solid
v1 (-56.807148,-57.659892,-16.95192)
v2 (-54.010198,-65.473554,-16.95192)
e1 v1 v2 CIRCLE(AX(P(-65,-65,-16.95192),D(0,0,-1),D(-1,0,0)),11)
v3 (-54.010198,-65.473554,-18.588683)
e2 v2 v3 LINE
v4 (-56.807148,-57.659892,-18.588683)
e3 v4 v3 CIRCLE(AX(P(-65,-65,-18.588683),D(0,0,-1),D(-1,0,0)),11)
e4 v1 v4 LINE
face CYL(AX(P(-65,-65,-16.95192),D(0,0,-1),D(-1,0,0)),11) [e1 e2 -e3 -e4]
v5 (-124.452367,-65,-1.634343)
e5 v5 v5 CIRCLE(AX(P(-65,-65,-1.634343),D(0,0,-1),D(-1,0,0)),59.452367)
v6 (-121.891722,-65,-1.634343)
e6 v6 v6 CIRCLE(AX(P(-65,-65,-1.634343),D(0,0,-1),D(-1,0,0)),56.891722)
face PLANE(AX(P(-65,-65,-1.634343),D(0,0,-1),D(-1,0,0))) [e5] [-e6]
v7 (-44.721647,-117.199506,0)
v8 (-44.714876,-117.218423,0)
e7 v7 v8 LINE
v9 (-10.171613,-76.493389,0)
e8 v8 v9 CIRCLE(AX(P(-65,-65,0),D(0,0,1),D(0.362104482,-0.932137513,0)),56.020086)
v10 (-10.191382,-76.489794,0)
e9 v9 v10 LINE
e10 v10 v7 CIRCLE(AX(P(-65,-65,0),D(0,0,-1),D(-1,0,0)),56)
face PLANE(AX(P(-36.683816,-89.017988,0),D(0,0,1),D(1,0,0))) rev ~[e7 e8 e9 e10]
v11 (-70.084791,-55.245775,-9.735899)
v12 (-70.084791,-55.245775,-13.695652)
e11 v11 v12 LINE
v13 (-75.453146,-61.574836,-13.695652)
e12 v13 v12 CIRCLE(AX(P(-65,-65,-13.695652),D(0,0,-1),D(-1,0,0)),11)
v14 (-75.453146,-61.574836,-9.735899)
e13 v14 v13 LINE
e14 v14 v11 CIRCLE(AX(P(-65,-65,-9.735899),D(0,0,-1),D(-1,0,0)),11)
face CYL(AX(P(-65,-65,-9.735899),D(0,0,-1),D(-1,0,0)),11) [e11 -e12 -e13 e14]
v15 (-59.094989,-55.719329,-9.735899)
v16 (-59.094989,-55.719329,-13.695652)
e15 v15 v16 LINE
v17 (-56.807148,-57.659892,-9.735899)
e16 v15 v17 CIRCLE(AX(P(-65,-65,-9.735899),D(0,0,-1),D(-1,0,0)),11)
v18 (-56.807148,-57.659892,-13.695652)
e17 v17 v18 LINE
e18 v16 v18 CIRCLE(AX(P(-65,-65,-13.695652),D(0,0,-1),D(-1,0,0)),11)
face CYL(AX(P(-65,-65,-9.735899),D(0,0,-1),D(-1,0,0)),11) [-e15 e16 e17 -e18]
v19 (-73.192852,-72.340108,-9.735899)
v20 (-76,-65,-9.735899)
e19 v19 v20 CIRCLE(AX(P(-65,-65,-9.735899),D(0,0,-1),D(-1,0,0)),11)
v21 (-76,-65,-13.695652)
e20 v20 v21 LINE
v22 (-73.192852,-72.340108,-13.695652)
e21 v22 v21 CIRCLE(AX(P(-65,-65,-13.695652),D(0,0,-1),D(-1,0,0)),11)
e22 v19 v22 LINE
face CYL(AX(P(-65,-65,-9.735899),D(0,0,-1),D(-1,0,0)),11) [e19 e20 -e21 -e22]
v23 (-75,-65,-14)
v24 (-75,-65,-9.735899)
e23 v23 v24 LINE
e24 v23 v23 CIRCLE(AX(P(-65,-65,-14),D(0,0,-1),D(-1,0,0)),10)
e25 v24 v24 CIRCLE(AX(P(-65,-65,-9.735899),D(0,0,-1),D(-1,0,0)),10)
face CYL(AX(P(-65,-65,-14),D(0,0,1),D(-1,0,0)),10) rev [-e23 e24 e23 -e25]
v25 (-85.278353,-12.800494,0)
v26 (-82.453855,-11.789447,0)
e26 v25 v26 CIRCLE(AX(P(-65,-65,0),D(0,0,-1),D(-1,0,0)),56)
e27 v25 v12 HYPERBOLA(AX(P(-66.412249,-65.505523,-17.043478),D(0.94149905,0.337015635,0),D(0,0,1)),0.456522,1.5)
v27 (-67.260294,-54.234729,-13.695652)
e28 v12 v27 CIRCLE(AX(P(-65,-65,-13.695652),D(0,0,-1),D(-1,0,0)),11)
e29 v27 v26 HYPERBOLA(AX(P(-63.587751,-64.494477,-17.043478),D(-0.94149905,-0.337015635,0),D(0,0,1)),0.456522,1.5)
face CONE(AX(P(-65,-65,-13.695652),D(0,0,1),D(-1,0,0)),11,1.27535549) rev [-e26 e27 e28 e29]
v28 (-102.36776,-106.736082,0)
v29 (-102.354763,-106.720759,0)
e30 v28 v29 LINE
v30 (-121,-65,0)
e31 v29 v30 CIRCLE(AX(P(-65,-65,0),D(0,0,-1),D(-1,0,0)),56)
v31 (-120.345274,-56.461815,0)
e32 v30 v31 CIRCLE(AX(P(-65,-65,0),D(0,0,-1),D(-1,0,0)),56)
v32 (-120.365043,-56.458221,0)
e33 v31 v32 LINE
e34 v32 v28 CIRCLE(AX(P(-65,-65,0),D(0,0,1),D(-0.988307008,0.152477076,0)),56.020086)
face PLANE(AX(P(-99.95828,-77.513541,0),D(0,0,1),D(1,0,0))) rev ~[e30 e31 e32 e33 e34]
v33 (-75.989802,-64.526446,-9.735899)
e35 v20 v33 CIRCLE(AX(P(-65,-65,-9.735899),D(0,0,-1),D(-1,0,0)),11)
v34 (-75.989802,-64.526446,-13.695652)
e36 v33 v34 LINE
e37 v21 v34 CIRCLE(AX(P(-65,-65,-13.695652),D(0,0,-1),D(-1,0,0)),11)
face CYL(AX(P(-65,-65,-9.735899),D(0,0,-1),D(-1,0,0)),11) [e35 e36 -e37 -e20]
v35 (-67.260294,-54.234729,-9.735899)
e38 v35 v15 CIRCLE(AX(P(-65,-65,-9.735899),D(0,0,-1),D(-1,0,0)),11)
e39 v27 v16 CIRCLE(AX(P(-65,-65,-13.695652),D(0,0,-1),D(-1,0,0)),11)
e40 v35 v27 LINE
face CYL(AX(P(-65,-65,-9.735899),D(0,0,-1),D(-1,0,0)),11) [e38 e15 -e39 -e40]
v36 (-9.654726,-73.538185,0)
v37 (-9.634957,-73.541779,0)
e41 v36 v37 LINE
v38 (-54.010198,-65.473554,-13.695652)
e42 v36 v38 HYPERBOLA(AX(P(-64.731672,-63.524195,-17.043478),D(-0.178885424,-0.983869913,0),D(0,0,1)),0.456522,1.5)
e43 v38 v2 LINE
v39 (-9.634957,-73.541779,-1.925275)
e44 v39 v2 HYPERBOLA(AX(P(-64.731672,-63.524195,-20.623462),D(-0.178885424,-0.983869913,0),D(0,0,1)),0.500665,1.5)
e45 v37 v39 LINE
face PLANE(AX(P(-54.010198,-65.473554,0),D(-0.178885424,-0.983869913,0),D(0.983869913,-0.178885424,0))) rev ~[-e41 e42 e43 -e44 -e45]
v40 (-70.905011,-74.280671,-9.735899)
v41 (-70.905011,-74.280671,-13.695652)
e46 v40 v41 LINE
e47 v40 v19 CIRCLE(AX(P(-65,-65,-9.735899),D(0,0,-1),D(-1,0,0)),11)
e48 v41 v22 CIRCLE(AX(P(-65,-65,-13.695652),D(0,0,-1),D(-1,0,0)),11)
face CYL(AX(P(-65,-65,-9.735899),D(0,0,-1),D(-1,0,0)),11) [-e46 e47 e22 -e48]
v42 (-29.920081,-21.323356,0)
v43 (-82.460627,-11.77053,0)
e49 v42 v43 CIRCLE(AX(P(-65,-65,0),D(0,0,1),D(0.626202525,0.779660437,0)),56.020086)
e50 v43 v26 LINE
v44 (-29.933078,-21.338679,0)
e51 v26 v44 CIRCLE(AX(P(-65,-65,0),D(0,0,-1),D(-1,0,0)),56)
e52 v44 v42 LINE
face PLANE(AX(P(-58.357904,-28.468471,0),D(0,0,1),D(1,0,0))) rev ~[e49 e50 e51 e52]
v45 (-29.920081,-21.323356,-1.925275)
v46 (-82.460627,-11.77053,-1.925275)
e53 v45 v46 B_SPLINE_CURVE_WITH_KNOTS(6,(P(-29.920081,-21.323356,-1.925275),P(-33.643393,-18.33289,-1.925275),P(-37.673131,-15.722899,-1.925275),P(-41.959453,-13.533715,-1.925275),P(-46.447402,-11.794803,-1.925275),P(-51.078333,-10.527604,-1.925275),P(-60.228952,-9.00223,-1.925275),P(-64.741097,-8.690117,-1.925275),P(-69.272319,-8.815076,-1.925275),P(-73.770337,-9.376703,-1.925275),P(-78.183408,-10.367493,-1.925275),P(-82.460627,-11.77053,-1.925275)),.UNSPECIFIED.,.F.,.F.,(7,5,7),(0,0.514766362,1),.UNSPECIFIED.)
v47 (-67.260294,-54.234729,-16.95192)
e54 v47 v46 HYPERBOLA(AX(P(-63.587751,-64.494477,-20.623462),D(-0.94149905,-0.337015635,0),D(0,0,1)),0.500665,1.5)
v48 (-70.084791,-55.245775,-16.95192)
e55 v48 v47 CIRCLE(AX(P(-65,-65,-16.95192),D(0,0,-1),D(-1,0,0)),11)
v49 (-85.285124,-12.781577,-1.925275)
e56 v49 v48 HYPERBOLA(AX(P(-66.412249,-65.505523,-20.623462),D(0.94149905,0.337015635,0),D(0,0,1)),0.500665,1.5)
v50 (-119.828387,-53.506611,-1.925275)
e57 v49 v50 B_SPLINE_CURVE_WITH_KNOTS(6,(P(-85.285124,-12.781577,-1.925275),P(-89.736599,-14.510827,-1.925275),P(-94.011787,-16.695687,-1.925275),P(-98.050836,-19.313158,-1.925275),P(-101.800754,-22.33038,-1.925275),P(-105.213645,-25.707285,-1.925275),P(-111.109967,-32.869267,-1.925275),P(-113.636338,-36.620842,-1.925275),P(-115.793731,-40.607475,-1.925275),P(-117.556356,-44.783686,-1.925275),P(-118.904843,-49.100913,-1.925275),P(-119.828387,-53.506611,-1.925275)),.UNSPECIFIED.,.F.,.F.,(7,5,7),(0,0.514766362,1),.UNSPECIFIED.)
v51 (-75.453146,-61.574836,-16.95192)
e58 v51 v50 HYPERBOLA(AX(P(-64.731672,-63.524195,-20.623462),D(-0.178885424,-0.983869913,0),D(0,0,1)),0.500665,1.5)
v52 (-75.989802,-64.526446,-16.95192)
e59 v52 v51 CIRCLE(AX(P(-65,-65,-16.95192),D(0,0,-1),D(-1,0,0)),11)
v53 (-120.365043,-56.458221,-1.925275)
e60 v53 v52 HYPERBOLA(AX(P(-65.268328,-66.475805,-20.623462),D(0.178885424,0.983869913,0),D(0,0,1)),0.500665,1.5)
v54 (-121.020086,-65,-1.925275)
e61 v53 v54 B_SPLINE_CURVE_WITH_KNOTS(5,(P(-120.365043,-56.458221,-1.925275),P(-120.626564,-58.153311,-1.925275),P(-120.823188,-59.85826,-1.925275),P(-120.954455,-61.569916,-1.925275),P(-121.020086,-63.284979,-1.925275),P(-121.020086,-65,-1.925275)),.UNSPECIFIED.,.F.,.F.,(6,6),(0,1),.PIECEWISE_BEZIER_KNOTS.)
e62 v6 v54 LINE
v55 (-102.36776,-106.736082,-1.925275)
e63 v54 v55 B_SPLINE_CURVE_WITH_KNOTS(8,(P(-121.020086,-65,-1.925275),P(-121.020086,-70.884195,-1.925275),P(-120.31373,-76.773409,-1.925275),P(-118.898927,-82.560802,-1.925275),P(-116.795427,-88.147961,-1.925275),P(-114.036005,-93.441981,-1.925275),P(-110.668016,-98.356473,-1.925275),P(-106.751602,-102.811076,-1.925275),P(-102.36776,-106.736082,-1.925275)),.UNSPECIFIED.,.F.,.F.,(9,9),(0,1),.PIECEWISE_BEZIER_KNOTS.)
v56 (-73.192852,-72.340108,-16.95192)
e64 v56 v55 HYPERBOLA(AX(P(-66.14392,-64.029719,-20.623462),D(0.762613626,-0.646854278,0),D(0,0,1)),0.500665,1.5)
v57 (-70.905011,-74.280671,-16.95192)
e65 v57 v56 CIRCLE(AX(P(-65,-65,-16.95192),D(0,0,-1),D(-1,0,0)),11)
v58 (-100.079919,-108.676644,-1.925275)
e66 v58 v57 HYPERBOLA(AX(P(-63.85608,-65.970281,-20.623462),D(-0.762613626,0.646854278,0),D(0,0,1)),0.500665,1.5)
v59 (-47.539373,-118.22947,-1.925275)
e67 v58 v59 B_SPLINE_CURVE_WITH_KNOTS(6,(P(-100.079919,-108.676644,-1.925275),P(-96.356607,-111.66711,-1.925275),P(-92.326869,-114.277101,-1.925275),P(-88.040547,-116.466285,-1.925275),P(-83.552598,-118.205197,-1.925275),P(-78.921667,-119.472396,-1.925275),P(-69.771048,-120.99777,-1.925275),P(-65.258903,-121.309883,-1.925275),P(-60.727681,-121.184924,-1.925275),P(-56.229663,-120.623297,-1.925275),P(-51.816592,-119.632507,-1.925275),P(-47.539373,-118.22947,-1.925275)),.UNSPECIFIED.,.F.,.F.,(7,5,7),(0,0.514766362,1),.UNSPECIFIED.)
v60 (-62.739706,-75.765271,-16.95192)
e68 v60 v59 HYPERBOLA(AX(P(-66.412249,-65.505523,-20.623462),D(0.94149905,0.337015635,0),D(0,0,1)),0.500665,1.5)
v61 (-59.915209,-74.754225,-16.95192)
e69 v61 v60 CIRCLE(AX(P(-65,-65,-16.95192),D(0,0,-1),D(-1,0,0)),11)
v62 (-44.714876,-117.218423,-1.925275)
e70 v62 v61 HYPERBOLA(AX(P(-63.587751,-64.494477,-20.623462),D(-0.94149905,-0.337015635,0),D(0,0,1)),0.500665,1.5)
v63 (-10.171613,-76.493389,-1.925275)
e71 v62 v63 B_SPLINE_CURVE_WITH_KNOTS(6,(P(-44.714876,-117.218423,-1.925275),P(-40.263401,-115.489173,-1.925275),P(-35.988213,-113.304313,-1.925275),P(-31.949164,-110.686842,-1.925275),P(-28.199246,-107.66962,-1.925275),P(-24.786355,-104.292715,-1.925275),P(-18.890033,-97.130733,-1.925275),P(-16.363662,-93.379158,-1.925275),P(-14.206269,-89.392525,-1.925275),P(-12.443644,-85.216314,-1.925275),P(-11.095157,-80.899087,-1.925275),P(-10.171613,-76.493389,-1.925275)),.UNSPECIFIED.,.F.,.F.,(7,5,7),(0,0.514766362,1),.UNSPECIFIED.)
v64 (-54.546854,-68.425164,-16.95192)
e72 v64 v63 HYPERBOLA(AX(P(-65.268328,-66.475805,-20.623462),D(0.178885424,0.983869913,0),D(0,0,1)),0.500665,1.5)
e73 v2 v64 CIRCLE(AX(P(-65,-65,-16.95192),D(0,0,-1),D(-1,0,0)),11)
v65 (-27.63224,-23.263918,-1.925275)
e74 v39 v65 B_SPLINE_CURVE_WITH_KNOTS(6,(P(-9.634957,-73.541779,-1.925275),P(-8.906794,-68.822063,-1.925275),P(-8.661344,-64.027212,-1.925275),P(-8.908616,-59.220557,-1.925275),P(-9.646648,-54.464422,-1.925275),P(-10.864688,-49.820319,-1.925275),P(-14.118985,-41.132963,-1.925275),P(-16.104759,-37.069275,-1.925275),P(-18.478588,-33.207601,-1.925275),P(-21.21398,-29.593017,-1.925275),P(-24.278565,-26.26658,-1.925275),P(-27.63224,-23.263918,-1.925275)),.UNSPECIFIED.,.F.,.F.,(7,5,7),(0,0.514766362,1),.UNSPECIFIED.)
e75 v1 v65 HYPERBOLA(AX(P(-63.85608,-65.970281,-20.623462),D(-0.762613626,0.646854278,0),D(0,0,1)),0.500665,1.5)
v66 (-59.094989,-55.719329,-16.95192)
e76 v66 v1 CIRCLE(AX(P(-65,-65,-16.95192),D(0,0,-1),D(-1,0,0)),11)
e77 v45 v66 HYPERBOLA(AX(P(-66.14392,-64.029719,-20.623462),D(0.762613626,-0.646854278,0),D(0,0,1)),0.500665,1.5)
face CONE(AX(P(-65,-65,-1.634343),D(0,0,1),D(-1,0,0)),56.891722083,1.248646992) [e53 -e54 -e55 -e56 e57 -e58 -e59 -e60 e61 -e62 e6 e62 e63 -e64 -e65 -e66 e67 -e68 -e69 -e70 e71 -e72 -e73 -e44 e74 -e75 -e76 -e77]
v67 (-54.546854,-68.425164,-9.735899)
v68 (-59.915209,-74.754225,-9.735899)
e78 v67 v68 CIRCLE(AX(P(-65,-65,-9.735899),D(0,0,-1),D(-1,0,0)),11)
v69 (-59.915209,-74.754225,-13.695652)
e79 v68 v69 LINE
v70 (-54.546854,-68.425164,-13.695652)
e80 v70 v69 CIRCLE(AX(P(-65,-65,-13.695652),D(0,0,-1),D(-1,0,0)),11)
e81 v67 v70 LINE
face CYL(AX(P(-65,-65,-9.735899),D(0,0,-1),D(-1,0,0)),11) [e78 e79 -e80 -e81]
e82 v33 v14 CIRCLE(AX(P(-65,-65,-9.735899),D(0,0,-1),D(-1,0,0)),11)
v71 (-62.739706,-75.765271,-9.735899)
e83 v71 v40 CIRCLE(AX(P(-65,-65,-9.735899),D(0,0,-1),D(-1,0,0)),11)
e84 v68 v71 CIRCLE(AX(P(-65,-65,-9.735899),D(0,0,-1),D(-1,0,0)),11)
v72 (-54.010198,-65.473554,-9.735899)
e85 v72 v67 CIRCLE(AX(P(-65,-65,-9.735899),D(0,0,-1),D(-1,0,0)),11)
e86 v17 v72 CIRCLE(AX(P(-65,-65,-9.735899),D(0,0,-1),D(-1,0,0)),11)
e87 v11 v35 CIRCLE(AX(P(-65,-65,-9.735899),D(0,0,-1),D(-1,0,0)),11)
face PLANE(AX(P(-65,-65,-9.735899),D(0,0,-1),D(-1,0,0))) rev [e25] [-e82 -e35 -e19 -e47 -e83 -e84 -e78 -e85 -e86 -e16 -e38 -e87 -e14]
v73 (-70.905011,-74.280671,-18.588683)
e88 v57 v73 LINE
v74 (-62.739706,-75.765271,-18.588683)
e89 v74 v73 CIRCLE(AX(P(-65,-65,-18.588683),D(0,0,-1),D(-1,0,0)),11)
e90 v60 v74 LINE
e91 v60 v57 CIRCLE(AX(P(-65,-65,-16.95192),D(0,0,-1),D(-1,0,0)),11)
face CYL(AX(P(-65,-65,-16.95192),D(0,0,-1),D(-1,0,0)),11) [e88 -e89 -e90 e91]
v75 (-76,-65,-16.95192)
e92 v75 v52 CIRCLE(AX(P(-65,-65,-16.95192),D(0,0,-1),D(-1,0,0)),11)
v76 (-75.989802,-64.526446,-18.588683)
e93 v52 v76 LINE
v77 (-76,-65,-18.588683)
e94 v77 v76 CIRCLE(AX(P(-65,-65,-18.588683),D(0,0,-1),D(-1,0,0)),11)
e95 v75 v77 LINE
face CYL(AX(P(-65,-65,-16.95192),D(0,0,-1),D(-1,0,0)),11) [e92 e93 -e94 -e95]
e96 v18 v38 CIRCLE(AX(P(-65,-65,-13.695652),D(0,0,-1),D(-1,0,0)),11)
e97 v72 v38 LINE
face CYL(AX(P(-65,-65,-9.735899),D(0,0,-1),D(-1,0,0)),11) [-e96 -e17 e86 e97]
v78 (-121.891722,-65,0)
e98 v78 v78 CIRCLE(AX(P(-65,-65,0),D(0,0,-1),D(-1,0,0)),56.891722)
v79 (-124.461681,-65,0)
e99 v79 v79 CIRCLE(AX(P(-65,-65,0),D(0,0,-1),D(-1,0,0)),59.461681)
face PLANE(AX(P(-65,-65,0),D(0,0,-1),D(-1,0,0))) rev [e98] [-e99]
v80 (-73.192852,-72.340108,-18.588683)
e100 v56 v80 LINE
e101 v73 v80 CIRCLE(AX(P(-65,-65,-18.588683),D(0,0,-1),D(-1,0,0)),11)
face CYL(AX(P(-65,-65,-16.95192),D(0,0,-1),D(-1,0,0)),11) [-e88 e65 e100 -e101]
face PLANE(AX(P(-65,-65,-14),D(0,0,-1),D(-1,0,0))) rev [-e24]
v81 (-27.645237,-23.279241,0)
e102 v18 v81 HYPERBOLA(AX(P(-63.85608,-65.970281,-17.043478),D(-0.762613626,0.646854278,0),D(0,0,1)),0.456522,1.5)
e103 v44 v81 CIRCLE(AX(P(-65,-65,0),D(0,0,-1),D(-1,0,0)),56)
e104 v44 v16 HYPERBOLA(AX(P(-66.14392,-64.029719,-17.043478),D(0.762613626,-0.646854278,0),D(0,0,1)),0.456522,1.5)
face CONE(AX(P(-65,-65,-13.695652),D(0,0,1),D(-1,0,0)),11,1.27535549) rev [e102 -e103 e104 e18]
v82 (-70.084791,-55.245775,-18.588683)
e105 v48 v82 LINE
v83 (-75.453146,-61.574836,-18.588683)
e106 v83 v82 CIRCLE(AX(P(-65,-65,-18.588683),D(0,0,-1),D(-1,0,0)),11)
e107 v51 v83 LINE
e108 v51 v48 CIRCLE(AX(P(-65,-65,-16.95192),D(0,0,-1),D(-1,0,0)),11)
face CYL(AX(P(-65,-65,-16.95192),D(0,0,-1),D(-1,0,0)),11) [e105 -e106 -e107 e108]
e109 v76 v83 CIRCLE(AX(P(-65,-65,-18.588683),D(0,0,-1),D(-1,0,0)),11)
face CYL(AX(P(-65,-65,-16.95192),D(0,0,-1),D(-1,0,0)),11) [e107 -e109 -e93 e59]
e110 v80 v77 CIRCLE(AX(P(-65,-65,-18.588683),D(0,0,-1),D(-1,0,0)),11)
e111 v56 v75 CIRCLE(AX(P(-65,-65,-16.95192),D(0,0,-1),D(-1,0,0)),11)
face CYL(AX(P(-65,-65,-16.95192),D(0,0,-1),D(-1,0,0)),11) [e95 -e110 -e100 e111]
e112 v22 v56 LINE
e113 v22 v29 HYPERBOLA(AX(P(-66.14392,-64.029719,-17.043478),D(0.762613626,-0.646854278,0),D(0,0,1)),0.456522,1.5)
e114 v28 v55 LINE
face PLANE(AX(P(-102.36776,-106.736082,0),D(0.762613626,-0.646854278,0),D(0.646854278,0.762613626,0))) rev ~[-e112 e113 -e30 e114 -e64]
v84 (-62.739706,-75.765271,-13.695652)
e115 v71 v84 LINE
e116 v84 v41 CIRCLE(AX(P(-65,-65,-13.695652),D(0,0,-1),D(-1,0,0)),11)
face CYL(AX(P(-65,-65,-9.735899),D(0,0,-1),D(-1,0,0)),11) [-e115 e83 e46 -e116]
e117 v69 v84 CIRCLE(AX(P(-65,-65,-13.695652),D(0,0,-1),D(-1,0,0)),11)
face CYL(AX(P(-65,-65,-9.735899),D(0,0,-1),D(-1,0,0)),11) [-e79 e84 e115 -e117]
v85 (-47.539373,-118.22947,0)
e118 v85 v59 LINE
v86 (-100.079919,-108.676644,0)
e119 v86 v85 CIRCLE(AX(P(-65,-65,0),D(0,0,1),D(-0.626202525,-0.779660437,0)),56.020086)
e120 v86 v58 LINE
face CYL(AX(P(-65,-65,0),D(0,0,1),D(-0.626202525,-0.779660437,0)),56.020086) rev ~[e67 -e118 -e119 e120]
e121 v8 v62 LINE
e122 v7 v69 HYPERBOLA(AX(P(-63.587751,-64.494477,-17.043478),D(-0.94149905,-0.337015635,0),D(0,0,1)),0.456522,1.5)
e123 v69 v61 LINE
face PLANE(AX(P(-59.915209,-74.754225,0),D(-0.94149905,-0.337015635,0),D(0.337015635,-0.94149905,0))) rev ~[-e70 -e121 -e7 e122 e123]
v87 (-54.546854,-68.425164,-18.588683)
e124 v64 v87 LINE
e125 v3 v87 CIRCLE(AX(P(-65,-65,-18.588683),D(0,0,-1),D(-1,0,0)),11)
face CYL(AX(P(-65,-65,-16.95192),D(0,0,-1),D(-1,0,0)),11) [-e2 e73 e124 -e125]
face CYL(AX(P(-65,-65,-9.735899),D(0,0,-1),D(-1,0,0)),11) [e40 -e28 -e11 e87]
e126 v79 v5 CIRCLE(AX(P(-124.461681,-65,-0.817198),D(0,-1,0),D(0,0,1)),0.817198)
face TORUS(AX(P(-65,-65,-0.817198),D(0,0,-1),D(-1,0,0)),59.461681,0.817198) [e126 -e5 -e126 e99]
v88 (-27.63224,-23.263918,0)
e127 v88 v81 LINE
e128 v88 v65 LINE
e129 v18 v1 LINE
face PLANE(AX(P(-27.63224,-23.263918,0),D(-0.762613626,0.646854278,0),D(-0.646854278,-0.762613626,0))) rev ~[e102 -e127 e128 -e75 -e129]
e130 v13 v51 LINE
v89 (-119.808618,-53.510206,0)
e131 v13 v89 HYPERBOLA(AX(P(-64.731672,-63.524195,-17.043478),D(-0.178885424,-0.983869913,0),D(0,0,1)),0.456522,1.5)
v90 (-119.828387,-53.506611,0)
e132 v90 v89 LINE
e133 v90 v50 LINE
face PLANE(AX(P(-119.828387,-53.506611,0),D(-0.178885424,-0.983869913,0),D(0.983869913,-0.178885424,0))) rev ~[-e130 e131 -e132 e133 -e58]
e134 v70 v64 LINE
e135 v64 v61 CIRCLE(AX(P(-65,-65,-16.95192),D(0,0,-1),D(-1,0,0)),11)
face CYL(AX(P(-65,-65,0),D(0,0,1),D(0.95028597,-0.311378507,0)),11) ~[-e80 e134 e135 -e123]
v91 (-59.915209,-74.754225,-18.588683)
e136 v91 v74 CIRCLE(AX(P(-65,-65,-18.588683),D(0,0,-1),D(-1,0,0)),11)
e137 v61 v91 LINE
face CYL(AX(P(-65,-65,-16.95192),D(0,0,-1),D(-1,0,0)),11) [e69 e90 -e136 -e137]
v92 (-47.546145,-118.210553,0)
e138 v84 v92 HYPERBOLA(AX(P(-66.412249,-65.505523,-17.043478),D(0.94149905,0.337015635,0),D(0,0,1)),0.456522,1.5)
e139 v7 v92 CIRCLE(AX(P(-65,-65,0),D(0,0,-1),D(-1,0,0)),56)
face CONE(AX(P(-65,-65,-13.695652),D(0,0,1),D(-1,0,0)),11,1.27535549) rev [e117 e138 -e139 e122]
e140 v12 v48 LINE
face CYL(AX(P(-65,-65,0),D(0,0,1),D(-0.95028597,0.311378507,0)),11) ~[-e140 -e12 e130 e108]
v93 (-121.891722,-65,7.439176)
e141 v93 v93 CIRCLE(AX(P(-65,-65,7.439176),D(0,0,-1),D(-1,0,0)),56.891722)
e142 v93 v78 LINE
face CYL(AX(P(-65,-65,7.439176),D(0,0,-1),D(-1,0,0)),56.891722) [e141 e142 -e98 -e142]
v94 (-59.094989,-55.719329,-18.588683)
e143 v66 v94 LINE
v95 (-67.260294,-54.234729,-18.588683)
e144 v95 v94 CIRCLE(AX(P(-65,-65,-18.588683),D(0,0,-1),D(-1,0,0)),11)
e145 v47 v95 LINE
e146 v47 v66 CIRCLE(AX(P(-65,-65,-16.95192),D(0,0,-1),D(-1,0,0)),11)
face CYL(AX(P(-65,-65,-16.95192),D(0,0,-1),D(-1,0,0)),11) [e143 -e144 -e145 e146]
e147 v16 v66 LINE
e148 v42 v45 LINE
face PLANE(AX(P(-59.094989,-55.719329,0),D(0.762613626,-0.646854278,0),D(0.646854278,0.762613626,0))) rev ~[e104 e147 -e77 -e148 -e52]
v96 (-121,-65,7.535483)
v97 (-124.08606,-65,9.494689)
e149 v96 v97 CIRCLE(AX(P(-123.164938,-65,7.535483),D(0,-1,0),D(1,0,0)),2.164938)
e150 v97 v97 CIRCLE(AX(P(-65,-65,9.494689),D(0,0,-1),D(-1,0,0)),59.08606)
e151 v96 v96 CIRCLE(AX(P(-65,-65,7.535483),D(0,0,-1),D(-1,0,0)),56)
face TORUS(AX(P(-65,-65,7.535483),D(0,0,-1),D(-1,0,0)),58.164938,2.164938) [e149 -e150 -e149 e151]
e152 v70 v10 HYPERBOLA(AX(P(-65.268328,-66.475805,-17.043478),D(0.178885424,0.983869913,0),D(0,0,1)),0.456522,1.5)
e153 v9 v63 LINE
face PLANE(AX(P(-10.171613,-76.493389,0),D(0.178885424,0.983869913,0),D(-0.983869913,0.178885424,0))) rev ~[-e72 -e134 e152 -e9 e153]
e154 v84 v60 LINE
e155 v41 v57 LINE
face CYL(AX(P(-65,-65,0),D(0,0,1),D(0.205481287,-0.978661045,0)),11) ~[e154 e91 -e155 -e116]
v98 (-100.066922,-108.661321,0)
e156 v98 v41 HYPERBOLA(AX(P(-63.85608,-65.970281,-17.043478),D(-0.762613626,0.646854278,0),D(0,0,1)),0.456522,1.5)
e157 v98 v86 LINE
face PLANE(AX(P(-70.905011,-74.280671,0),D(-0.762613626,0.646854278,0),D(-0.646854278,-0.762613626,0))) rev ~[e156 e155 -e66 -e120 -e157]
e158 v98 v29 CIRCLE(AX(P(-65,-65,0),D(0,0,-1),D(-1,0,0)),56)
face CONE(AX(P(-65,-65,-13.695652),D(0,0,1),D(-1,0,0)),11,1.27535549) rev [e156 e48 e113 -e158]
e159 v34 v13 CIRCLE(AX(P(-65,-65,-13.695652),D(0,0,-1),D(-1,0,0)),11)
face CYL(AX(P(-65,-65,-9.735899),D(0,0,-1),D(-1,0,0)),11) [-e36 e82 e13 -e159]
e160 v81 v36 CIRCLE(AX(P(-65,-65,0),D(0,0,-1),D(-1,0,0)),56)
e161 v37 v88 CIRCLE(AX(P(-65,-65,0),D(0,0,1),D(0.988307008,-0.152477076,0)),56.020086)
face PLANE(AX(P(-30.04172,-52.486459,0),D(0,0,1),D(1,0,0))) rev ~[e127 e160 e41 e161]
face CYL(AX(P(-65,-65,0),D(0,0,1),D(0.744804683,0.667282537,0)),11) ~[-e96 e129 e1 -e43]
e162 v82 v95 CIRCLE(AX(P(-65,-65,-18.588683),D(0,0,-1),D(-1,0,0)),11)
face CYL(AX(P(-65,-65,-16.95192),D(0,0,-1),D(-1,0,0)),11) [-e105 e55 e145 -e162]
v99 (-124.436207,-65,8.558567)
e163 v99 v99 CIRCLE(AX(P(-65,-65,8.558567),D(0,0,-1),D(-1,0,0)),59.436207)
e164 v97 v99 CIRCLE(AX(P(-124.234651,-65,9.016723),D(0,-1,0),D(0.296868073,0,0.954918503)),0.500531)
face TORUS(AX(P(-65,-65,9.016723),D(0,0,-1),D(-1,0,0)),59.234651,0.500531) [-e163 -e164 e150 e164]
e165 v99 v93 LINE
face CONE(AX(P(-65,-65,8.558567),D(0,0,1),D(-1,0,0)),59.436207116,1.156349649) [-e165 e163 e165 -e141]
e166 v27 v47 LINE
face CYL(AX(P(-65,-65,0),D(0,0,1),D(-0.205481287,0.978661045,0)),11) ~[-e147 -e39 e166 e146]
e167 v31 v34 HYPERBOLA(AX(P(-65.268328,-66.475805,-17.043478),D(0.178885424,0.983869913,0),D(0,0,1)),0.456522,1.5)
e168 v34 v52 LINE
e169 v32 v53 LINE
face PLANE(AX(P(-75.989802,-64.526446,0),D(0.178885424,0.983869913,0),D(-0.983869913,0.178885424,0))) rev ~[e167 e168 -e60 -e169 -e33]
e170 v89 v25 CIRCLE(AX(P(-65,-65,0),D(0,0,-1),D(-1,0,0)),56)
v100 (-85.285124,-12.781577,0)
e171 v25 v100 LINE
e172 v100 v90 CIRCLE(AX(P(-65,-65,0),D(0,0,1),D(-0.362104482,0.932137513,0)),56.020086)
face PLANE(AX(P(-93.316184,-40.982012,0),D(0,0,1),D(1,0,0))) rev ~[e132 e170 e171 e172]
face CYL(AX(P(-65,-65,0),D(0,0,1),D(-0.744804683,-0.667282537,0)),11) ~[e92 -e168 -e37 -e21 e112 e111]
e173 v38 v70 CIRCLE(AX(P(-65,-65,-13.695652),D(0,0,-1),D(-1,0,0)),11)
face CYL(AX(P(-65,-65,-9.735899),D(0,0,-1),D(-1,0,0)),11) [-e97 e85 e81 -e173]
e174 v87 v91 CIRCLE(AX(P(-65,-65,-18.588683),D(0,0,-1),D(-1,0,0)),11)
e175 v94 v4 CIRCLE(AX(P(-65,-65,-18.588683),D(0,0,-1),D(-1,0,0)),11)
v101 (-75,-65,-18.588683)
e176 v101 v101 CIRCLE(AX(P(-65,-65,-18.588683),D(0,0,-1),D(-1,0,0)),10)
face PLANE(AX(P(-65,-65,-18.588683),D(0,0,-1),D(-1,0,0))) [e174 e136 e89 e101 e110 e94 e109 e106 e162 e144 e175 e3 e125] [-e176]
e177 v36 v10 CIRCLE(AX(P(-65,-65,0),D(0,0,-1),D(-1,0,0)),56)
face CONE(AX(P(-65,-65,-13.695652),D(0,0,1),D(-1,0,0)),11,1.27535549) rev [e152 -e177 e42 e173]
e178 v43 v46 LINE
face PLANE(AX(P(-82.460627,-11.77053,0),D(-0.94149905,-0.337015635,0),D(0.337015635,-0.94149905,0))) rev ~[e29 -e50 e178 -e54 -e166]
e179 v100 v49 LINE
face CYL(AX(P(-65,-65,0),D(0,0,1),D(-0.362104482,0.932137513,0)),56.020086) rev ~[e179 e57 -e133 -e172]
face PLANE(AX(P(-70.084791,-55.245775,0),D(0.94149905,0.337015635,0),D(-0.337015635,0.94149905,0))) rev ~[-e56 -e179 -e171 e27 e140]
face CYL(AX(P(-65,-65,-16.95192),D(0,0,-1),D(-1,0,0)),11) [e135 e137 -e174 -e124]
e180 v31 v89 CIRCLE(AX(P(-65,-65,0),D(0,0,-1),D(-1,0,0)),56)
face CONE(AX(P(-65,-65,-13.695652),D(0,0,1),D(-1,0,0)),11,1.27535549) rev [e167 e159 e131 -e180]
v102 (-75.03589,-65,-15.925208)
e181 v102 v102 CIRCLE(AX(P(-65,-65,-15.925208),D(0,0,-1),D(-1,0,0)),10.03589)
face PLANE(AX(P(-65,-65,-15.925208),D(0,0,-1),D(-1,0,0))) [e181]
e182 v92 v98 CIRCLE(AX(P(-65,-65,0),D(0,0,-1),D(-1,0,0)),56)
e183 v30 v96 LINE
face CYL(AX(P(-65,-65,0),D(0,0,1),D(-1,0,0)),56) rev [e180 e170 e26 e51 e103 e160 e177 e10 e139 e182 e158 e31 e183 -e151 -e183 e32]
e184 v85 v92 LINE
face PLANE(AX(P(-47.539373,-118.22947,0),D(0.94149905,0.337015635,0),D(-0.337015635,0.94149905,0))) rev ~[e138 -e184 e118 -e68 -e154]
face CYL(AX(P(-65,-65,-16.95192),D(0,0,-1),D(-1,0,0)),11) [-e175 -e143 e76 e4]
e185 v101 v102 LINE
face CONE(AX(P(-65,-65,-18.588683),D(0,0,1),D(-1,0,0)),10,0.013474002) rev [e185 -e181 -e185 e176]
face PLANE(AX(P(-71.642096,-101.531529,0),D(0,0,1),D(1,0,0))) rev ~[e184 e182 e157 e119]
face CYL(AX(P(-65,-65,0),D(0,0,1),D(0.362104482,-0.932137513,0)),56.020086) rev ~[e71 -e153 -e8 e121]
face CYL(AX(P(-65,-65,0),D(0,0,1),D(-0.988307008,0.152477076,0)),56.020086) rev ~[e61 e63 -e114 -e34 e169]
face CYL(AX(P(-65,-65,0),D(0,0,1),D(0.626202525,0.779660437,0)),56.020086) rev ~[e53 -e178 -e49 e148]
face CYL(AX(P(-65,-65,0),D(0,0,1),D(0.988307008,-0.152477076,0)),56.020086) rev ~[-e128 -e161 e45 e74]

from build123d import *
from build123d import SkipClean  # not in build123d's __all__

# Parameters (mm, degrees)
F5_DEPTH = 25


with BuildPart() as f3:
    # F2 (on offset) → F3 (revolve)
    with BuildSketch(Plane.XZ.offset(65)):
        with BuildLine():
            Line((-65, -15.9252075107), (-65, -14))
            Line((-65, -14), (-75, -14))
            Line((-75, -14), (-75, -9.7358990461))
            Line((-75, -9.7358990461), (-76, -9.7358990461))
            Line((-76, -9.7358990461), (-76, -13.6956521739))
            Line((-76, -13.6956521739), (-121, 0))
            Line((-121, 0), (-121, 7.5354827568))
            ThreePointArc((-121, 7.5354827568), (-122.0045964257, 9.3632036252), (-124.0860596299, 9.4946892932))
            ThreePointArc((-124.0860596299, 9.4946892932), (-124.7034612564, 9.1920763963), (-124.4362071157, 8.558566682))
            Line((-124.4362071157, 8.558566682), (-121.8917220831, 7.4391760863))
            Line((-121.8917220831, 7.4391760863), (-121.8917220831, 0))
            Line((-121.8917220831, 0), (-124.4616806507, 0))
            ThreePointArc((-124.4616806507, 0), (-125.2788653783, -0.8218546839), (-124.452367425, -1.6343429199))
            Line((-124.452367425, -1.6343429199), (-121.8917220831, -1.6343429199))
            Line((-121.8917220831, -1.6343429199), (-76, -16.9519204646))
            Line((-76, -16.9519204646), (-76, -18.5886826366))
            Line((-76, -18.5886826366), (-75, -18.5886826366))
            Line((-75, -18.5886826366), (-75.03588984, -15.9252075107))
            Line((-75.03588984, -15.9252075107), (-65, -15.9252075107))
        make_face()
    revolve(axis=Axis((-65, -65, -7), (0, 0, -1)))

    # F4 (on Top) → F5 (cut)
    with BuildSketch(Plane.XY):
        with BuildLine():
            ThreePointArc((-56.80714849, -57.6598920897), (-54.643510446, -61.2928280161), (-54.0101980565, -65.4735538439))
            Line((-54.0101980565, -65.4735538439), (-9.6349567528, -73.5417788684))
            ThreePointArc((-9.6349567528, -73.5417788684), (-12.2571425277, -46.1203552561), (-27.6322400034, -23.2639183339))
            Line((-27.6322400034, -23.2639183339), (-56.80714849, -57.6598920897))
        make_face()
        with BuildLine():
            Line((-70.0847913129, -55.2457754124), (-85.2851241301, -12.7815766321))
            ThreePointArc((-85.2851241301, -12.7815766321), (-107.7216806988, -28.7631679328), (-119.8283869755, -53.5066113935))
            Line((-119.8283869755, -53.5066113935), (-75.4531456718, -61.574836418))
            ThreePointArc((-75.4531456718, -61.574836418), (-73.3887498913, -57.8846029442), (-70.0847913129, -55.2457754124))
        make_face()
        with BuildLine():
            ThreePointArc((-29.9200808829, -21.3233555005), (-54.9788232265, -9.8835231888), (-82.460626979, -11.7705297274))
            Line((-82.460626979, -11.7705297274), (-67.2602941618, -54.2347285077))
            ThreePointArc((-67.2602941618, -54.2347285077), (-63.0322603373, -54.1774309603), (-59.0949893694, -55.7193292563))
            Line((-59.0949893694, -55.7193292563), (-29.9200808829, -21.3233555005))
        make_face()
        with BuildLine():
            ThreePointArc((-44.7148758699, -117.2184233679), (-22.2783193012, -101.2368320672), (-10.1716130245, -76.4933886065))
            Line((-10.1716130245, -76.4933886065), (-54.5468543282, -68.425163582))
            ThreePointArc((-54.5468543282, -68.425163582), (-56.6112501087, -72.1153970558), (-59.9152086871, -74.7542245876))
            Line((-59.9152086871, -74.7542245876), (-44.7148758699, -117.2184233679))
        make_face()
        with BuildLine():
            Line((-70.9050106306, -74.2806707437), (-100.0799191171, -108.6766444995))
            ThreePointArc((-100.0799191171, -108.6766444995), (-75.0211767735, -120.1164768112), (-47.539373021, -118.2294702726))
            Line((-47.539373021, -118.2294702726), (-62.7397058382, -75.7652714923))
            ThreePointArc((-62.7397058382, -75.7652714923), (-66.9677396627, -75.8225690397), (-70.9050106306, -74.2806707437))
        make_face()
        with BuildLine():
            ThreePointArc((-120.3650432472, -56.4582211316), (-117.7428574723, -83.8796447439), (-102.3677599966, -106.7360816661))
            Line((-102.3677599966, -106.7360816661), (-73.19285151, -72.3401079103))
            ThreePointArc((-73.19285151, -72.3401079103), (-75.356489554, -68.7071719839), (-75.9898019435, -64.5264461561))
            Line((-75.9898019435, -64.5264461561), (-120.3650432472, -56.4582211316))
        make_face()
    with SkipClean():  # cleaning this boolean's faces spoils the solid; the shape is the same uncleaned
        extrude(amount=-F5_DEPTH, mode=Mode.SUBTRACT)


solid = f3.part
